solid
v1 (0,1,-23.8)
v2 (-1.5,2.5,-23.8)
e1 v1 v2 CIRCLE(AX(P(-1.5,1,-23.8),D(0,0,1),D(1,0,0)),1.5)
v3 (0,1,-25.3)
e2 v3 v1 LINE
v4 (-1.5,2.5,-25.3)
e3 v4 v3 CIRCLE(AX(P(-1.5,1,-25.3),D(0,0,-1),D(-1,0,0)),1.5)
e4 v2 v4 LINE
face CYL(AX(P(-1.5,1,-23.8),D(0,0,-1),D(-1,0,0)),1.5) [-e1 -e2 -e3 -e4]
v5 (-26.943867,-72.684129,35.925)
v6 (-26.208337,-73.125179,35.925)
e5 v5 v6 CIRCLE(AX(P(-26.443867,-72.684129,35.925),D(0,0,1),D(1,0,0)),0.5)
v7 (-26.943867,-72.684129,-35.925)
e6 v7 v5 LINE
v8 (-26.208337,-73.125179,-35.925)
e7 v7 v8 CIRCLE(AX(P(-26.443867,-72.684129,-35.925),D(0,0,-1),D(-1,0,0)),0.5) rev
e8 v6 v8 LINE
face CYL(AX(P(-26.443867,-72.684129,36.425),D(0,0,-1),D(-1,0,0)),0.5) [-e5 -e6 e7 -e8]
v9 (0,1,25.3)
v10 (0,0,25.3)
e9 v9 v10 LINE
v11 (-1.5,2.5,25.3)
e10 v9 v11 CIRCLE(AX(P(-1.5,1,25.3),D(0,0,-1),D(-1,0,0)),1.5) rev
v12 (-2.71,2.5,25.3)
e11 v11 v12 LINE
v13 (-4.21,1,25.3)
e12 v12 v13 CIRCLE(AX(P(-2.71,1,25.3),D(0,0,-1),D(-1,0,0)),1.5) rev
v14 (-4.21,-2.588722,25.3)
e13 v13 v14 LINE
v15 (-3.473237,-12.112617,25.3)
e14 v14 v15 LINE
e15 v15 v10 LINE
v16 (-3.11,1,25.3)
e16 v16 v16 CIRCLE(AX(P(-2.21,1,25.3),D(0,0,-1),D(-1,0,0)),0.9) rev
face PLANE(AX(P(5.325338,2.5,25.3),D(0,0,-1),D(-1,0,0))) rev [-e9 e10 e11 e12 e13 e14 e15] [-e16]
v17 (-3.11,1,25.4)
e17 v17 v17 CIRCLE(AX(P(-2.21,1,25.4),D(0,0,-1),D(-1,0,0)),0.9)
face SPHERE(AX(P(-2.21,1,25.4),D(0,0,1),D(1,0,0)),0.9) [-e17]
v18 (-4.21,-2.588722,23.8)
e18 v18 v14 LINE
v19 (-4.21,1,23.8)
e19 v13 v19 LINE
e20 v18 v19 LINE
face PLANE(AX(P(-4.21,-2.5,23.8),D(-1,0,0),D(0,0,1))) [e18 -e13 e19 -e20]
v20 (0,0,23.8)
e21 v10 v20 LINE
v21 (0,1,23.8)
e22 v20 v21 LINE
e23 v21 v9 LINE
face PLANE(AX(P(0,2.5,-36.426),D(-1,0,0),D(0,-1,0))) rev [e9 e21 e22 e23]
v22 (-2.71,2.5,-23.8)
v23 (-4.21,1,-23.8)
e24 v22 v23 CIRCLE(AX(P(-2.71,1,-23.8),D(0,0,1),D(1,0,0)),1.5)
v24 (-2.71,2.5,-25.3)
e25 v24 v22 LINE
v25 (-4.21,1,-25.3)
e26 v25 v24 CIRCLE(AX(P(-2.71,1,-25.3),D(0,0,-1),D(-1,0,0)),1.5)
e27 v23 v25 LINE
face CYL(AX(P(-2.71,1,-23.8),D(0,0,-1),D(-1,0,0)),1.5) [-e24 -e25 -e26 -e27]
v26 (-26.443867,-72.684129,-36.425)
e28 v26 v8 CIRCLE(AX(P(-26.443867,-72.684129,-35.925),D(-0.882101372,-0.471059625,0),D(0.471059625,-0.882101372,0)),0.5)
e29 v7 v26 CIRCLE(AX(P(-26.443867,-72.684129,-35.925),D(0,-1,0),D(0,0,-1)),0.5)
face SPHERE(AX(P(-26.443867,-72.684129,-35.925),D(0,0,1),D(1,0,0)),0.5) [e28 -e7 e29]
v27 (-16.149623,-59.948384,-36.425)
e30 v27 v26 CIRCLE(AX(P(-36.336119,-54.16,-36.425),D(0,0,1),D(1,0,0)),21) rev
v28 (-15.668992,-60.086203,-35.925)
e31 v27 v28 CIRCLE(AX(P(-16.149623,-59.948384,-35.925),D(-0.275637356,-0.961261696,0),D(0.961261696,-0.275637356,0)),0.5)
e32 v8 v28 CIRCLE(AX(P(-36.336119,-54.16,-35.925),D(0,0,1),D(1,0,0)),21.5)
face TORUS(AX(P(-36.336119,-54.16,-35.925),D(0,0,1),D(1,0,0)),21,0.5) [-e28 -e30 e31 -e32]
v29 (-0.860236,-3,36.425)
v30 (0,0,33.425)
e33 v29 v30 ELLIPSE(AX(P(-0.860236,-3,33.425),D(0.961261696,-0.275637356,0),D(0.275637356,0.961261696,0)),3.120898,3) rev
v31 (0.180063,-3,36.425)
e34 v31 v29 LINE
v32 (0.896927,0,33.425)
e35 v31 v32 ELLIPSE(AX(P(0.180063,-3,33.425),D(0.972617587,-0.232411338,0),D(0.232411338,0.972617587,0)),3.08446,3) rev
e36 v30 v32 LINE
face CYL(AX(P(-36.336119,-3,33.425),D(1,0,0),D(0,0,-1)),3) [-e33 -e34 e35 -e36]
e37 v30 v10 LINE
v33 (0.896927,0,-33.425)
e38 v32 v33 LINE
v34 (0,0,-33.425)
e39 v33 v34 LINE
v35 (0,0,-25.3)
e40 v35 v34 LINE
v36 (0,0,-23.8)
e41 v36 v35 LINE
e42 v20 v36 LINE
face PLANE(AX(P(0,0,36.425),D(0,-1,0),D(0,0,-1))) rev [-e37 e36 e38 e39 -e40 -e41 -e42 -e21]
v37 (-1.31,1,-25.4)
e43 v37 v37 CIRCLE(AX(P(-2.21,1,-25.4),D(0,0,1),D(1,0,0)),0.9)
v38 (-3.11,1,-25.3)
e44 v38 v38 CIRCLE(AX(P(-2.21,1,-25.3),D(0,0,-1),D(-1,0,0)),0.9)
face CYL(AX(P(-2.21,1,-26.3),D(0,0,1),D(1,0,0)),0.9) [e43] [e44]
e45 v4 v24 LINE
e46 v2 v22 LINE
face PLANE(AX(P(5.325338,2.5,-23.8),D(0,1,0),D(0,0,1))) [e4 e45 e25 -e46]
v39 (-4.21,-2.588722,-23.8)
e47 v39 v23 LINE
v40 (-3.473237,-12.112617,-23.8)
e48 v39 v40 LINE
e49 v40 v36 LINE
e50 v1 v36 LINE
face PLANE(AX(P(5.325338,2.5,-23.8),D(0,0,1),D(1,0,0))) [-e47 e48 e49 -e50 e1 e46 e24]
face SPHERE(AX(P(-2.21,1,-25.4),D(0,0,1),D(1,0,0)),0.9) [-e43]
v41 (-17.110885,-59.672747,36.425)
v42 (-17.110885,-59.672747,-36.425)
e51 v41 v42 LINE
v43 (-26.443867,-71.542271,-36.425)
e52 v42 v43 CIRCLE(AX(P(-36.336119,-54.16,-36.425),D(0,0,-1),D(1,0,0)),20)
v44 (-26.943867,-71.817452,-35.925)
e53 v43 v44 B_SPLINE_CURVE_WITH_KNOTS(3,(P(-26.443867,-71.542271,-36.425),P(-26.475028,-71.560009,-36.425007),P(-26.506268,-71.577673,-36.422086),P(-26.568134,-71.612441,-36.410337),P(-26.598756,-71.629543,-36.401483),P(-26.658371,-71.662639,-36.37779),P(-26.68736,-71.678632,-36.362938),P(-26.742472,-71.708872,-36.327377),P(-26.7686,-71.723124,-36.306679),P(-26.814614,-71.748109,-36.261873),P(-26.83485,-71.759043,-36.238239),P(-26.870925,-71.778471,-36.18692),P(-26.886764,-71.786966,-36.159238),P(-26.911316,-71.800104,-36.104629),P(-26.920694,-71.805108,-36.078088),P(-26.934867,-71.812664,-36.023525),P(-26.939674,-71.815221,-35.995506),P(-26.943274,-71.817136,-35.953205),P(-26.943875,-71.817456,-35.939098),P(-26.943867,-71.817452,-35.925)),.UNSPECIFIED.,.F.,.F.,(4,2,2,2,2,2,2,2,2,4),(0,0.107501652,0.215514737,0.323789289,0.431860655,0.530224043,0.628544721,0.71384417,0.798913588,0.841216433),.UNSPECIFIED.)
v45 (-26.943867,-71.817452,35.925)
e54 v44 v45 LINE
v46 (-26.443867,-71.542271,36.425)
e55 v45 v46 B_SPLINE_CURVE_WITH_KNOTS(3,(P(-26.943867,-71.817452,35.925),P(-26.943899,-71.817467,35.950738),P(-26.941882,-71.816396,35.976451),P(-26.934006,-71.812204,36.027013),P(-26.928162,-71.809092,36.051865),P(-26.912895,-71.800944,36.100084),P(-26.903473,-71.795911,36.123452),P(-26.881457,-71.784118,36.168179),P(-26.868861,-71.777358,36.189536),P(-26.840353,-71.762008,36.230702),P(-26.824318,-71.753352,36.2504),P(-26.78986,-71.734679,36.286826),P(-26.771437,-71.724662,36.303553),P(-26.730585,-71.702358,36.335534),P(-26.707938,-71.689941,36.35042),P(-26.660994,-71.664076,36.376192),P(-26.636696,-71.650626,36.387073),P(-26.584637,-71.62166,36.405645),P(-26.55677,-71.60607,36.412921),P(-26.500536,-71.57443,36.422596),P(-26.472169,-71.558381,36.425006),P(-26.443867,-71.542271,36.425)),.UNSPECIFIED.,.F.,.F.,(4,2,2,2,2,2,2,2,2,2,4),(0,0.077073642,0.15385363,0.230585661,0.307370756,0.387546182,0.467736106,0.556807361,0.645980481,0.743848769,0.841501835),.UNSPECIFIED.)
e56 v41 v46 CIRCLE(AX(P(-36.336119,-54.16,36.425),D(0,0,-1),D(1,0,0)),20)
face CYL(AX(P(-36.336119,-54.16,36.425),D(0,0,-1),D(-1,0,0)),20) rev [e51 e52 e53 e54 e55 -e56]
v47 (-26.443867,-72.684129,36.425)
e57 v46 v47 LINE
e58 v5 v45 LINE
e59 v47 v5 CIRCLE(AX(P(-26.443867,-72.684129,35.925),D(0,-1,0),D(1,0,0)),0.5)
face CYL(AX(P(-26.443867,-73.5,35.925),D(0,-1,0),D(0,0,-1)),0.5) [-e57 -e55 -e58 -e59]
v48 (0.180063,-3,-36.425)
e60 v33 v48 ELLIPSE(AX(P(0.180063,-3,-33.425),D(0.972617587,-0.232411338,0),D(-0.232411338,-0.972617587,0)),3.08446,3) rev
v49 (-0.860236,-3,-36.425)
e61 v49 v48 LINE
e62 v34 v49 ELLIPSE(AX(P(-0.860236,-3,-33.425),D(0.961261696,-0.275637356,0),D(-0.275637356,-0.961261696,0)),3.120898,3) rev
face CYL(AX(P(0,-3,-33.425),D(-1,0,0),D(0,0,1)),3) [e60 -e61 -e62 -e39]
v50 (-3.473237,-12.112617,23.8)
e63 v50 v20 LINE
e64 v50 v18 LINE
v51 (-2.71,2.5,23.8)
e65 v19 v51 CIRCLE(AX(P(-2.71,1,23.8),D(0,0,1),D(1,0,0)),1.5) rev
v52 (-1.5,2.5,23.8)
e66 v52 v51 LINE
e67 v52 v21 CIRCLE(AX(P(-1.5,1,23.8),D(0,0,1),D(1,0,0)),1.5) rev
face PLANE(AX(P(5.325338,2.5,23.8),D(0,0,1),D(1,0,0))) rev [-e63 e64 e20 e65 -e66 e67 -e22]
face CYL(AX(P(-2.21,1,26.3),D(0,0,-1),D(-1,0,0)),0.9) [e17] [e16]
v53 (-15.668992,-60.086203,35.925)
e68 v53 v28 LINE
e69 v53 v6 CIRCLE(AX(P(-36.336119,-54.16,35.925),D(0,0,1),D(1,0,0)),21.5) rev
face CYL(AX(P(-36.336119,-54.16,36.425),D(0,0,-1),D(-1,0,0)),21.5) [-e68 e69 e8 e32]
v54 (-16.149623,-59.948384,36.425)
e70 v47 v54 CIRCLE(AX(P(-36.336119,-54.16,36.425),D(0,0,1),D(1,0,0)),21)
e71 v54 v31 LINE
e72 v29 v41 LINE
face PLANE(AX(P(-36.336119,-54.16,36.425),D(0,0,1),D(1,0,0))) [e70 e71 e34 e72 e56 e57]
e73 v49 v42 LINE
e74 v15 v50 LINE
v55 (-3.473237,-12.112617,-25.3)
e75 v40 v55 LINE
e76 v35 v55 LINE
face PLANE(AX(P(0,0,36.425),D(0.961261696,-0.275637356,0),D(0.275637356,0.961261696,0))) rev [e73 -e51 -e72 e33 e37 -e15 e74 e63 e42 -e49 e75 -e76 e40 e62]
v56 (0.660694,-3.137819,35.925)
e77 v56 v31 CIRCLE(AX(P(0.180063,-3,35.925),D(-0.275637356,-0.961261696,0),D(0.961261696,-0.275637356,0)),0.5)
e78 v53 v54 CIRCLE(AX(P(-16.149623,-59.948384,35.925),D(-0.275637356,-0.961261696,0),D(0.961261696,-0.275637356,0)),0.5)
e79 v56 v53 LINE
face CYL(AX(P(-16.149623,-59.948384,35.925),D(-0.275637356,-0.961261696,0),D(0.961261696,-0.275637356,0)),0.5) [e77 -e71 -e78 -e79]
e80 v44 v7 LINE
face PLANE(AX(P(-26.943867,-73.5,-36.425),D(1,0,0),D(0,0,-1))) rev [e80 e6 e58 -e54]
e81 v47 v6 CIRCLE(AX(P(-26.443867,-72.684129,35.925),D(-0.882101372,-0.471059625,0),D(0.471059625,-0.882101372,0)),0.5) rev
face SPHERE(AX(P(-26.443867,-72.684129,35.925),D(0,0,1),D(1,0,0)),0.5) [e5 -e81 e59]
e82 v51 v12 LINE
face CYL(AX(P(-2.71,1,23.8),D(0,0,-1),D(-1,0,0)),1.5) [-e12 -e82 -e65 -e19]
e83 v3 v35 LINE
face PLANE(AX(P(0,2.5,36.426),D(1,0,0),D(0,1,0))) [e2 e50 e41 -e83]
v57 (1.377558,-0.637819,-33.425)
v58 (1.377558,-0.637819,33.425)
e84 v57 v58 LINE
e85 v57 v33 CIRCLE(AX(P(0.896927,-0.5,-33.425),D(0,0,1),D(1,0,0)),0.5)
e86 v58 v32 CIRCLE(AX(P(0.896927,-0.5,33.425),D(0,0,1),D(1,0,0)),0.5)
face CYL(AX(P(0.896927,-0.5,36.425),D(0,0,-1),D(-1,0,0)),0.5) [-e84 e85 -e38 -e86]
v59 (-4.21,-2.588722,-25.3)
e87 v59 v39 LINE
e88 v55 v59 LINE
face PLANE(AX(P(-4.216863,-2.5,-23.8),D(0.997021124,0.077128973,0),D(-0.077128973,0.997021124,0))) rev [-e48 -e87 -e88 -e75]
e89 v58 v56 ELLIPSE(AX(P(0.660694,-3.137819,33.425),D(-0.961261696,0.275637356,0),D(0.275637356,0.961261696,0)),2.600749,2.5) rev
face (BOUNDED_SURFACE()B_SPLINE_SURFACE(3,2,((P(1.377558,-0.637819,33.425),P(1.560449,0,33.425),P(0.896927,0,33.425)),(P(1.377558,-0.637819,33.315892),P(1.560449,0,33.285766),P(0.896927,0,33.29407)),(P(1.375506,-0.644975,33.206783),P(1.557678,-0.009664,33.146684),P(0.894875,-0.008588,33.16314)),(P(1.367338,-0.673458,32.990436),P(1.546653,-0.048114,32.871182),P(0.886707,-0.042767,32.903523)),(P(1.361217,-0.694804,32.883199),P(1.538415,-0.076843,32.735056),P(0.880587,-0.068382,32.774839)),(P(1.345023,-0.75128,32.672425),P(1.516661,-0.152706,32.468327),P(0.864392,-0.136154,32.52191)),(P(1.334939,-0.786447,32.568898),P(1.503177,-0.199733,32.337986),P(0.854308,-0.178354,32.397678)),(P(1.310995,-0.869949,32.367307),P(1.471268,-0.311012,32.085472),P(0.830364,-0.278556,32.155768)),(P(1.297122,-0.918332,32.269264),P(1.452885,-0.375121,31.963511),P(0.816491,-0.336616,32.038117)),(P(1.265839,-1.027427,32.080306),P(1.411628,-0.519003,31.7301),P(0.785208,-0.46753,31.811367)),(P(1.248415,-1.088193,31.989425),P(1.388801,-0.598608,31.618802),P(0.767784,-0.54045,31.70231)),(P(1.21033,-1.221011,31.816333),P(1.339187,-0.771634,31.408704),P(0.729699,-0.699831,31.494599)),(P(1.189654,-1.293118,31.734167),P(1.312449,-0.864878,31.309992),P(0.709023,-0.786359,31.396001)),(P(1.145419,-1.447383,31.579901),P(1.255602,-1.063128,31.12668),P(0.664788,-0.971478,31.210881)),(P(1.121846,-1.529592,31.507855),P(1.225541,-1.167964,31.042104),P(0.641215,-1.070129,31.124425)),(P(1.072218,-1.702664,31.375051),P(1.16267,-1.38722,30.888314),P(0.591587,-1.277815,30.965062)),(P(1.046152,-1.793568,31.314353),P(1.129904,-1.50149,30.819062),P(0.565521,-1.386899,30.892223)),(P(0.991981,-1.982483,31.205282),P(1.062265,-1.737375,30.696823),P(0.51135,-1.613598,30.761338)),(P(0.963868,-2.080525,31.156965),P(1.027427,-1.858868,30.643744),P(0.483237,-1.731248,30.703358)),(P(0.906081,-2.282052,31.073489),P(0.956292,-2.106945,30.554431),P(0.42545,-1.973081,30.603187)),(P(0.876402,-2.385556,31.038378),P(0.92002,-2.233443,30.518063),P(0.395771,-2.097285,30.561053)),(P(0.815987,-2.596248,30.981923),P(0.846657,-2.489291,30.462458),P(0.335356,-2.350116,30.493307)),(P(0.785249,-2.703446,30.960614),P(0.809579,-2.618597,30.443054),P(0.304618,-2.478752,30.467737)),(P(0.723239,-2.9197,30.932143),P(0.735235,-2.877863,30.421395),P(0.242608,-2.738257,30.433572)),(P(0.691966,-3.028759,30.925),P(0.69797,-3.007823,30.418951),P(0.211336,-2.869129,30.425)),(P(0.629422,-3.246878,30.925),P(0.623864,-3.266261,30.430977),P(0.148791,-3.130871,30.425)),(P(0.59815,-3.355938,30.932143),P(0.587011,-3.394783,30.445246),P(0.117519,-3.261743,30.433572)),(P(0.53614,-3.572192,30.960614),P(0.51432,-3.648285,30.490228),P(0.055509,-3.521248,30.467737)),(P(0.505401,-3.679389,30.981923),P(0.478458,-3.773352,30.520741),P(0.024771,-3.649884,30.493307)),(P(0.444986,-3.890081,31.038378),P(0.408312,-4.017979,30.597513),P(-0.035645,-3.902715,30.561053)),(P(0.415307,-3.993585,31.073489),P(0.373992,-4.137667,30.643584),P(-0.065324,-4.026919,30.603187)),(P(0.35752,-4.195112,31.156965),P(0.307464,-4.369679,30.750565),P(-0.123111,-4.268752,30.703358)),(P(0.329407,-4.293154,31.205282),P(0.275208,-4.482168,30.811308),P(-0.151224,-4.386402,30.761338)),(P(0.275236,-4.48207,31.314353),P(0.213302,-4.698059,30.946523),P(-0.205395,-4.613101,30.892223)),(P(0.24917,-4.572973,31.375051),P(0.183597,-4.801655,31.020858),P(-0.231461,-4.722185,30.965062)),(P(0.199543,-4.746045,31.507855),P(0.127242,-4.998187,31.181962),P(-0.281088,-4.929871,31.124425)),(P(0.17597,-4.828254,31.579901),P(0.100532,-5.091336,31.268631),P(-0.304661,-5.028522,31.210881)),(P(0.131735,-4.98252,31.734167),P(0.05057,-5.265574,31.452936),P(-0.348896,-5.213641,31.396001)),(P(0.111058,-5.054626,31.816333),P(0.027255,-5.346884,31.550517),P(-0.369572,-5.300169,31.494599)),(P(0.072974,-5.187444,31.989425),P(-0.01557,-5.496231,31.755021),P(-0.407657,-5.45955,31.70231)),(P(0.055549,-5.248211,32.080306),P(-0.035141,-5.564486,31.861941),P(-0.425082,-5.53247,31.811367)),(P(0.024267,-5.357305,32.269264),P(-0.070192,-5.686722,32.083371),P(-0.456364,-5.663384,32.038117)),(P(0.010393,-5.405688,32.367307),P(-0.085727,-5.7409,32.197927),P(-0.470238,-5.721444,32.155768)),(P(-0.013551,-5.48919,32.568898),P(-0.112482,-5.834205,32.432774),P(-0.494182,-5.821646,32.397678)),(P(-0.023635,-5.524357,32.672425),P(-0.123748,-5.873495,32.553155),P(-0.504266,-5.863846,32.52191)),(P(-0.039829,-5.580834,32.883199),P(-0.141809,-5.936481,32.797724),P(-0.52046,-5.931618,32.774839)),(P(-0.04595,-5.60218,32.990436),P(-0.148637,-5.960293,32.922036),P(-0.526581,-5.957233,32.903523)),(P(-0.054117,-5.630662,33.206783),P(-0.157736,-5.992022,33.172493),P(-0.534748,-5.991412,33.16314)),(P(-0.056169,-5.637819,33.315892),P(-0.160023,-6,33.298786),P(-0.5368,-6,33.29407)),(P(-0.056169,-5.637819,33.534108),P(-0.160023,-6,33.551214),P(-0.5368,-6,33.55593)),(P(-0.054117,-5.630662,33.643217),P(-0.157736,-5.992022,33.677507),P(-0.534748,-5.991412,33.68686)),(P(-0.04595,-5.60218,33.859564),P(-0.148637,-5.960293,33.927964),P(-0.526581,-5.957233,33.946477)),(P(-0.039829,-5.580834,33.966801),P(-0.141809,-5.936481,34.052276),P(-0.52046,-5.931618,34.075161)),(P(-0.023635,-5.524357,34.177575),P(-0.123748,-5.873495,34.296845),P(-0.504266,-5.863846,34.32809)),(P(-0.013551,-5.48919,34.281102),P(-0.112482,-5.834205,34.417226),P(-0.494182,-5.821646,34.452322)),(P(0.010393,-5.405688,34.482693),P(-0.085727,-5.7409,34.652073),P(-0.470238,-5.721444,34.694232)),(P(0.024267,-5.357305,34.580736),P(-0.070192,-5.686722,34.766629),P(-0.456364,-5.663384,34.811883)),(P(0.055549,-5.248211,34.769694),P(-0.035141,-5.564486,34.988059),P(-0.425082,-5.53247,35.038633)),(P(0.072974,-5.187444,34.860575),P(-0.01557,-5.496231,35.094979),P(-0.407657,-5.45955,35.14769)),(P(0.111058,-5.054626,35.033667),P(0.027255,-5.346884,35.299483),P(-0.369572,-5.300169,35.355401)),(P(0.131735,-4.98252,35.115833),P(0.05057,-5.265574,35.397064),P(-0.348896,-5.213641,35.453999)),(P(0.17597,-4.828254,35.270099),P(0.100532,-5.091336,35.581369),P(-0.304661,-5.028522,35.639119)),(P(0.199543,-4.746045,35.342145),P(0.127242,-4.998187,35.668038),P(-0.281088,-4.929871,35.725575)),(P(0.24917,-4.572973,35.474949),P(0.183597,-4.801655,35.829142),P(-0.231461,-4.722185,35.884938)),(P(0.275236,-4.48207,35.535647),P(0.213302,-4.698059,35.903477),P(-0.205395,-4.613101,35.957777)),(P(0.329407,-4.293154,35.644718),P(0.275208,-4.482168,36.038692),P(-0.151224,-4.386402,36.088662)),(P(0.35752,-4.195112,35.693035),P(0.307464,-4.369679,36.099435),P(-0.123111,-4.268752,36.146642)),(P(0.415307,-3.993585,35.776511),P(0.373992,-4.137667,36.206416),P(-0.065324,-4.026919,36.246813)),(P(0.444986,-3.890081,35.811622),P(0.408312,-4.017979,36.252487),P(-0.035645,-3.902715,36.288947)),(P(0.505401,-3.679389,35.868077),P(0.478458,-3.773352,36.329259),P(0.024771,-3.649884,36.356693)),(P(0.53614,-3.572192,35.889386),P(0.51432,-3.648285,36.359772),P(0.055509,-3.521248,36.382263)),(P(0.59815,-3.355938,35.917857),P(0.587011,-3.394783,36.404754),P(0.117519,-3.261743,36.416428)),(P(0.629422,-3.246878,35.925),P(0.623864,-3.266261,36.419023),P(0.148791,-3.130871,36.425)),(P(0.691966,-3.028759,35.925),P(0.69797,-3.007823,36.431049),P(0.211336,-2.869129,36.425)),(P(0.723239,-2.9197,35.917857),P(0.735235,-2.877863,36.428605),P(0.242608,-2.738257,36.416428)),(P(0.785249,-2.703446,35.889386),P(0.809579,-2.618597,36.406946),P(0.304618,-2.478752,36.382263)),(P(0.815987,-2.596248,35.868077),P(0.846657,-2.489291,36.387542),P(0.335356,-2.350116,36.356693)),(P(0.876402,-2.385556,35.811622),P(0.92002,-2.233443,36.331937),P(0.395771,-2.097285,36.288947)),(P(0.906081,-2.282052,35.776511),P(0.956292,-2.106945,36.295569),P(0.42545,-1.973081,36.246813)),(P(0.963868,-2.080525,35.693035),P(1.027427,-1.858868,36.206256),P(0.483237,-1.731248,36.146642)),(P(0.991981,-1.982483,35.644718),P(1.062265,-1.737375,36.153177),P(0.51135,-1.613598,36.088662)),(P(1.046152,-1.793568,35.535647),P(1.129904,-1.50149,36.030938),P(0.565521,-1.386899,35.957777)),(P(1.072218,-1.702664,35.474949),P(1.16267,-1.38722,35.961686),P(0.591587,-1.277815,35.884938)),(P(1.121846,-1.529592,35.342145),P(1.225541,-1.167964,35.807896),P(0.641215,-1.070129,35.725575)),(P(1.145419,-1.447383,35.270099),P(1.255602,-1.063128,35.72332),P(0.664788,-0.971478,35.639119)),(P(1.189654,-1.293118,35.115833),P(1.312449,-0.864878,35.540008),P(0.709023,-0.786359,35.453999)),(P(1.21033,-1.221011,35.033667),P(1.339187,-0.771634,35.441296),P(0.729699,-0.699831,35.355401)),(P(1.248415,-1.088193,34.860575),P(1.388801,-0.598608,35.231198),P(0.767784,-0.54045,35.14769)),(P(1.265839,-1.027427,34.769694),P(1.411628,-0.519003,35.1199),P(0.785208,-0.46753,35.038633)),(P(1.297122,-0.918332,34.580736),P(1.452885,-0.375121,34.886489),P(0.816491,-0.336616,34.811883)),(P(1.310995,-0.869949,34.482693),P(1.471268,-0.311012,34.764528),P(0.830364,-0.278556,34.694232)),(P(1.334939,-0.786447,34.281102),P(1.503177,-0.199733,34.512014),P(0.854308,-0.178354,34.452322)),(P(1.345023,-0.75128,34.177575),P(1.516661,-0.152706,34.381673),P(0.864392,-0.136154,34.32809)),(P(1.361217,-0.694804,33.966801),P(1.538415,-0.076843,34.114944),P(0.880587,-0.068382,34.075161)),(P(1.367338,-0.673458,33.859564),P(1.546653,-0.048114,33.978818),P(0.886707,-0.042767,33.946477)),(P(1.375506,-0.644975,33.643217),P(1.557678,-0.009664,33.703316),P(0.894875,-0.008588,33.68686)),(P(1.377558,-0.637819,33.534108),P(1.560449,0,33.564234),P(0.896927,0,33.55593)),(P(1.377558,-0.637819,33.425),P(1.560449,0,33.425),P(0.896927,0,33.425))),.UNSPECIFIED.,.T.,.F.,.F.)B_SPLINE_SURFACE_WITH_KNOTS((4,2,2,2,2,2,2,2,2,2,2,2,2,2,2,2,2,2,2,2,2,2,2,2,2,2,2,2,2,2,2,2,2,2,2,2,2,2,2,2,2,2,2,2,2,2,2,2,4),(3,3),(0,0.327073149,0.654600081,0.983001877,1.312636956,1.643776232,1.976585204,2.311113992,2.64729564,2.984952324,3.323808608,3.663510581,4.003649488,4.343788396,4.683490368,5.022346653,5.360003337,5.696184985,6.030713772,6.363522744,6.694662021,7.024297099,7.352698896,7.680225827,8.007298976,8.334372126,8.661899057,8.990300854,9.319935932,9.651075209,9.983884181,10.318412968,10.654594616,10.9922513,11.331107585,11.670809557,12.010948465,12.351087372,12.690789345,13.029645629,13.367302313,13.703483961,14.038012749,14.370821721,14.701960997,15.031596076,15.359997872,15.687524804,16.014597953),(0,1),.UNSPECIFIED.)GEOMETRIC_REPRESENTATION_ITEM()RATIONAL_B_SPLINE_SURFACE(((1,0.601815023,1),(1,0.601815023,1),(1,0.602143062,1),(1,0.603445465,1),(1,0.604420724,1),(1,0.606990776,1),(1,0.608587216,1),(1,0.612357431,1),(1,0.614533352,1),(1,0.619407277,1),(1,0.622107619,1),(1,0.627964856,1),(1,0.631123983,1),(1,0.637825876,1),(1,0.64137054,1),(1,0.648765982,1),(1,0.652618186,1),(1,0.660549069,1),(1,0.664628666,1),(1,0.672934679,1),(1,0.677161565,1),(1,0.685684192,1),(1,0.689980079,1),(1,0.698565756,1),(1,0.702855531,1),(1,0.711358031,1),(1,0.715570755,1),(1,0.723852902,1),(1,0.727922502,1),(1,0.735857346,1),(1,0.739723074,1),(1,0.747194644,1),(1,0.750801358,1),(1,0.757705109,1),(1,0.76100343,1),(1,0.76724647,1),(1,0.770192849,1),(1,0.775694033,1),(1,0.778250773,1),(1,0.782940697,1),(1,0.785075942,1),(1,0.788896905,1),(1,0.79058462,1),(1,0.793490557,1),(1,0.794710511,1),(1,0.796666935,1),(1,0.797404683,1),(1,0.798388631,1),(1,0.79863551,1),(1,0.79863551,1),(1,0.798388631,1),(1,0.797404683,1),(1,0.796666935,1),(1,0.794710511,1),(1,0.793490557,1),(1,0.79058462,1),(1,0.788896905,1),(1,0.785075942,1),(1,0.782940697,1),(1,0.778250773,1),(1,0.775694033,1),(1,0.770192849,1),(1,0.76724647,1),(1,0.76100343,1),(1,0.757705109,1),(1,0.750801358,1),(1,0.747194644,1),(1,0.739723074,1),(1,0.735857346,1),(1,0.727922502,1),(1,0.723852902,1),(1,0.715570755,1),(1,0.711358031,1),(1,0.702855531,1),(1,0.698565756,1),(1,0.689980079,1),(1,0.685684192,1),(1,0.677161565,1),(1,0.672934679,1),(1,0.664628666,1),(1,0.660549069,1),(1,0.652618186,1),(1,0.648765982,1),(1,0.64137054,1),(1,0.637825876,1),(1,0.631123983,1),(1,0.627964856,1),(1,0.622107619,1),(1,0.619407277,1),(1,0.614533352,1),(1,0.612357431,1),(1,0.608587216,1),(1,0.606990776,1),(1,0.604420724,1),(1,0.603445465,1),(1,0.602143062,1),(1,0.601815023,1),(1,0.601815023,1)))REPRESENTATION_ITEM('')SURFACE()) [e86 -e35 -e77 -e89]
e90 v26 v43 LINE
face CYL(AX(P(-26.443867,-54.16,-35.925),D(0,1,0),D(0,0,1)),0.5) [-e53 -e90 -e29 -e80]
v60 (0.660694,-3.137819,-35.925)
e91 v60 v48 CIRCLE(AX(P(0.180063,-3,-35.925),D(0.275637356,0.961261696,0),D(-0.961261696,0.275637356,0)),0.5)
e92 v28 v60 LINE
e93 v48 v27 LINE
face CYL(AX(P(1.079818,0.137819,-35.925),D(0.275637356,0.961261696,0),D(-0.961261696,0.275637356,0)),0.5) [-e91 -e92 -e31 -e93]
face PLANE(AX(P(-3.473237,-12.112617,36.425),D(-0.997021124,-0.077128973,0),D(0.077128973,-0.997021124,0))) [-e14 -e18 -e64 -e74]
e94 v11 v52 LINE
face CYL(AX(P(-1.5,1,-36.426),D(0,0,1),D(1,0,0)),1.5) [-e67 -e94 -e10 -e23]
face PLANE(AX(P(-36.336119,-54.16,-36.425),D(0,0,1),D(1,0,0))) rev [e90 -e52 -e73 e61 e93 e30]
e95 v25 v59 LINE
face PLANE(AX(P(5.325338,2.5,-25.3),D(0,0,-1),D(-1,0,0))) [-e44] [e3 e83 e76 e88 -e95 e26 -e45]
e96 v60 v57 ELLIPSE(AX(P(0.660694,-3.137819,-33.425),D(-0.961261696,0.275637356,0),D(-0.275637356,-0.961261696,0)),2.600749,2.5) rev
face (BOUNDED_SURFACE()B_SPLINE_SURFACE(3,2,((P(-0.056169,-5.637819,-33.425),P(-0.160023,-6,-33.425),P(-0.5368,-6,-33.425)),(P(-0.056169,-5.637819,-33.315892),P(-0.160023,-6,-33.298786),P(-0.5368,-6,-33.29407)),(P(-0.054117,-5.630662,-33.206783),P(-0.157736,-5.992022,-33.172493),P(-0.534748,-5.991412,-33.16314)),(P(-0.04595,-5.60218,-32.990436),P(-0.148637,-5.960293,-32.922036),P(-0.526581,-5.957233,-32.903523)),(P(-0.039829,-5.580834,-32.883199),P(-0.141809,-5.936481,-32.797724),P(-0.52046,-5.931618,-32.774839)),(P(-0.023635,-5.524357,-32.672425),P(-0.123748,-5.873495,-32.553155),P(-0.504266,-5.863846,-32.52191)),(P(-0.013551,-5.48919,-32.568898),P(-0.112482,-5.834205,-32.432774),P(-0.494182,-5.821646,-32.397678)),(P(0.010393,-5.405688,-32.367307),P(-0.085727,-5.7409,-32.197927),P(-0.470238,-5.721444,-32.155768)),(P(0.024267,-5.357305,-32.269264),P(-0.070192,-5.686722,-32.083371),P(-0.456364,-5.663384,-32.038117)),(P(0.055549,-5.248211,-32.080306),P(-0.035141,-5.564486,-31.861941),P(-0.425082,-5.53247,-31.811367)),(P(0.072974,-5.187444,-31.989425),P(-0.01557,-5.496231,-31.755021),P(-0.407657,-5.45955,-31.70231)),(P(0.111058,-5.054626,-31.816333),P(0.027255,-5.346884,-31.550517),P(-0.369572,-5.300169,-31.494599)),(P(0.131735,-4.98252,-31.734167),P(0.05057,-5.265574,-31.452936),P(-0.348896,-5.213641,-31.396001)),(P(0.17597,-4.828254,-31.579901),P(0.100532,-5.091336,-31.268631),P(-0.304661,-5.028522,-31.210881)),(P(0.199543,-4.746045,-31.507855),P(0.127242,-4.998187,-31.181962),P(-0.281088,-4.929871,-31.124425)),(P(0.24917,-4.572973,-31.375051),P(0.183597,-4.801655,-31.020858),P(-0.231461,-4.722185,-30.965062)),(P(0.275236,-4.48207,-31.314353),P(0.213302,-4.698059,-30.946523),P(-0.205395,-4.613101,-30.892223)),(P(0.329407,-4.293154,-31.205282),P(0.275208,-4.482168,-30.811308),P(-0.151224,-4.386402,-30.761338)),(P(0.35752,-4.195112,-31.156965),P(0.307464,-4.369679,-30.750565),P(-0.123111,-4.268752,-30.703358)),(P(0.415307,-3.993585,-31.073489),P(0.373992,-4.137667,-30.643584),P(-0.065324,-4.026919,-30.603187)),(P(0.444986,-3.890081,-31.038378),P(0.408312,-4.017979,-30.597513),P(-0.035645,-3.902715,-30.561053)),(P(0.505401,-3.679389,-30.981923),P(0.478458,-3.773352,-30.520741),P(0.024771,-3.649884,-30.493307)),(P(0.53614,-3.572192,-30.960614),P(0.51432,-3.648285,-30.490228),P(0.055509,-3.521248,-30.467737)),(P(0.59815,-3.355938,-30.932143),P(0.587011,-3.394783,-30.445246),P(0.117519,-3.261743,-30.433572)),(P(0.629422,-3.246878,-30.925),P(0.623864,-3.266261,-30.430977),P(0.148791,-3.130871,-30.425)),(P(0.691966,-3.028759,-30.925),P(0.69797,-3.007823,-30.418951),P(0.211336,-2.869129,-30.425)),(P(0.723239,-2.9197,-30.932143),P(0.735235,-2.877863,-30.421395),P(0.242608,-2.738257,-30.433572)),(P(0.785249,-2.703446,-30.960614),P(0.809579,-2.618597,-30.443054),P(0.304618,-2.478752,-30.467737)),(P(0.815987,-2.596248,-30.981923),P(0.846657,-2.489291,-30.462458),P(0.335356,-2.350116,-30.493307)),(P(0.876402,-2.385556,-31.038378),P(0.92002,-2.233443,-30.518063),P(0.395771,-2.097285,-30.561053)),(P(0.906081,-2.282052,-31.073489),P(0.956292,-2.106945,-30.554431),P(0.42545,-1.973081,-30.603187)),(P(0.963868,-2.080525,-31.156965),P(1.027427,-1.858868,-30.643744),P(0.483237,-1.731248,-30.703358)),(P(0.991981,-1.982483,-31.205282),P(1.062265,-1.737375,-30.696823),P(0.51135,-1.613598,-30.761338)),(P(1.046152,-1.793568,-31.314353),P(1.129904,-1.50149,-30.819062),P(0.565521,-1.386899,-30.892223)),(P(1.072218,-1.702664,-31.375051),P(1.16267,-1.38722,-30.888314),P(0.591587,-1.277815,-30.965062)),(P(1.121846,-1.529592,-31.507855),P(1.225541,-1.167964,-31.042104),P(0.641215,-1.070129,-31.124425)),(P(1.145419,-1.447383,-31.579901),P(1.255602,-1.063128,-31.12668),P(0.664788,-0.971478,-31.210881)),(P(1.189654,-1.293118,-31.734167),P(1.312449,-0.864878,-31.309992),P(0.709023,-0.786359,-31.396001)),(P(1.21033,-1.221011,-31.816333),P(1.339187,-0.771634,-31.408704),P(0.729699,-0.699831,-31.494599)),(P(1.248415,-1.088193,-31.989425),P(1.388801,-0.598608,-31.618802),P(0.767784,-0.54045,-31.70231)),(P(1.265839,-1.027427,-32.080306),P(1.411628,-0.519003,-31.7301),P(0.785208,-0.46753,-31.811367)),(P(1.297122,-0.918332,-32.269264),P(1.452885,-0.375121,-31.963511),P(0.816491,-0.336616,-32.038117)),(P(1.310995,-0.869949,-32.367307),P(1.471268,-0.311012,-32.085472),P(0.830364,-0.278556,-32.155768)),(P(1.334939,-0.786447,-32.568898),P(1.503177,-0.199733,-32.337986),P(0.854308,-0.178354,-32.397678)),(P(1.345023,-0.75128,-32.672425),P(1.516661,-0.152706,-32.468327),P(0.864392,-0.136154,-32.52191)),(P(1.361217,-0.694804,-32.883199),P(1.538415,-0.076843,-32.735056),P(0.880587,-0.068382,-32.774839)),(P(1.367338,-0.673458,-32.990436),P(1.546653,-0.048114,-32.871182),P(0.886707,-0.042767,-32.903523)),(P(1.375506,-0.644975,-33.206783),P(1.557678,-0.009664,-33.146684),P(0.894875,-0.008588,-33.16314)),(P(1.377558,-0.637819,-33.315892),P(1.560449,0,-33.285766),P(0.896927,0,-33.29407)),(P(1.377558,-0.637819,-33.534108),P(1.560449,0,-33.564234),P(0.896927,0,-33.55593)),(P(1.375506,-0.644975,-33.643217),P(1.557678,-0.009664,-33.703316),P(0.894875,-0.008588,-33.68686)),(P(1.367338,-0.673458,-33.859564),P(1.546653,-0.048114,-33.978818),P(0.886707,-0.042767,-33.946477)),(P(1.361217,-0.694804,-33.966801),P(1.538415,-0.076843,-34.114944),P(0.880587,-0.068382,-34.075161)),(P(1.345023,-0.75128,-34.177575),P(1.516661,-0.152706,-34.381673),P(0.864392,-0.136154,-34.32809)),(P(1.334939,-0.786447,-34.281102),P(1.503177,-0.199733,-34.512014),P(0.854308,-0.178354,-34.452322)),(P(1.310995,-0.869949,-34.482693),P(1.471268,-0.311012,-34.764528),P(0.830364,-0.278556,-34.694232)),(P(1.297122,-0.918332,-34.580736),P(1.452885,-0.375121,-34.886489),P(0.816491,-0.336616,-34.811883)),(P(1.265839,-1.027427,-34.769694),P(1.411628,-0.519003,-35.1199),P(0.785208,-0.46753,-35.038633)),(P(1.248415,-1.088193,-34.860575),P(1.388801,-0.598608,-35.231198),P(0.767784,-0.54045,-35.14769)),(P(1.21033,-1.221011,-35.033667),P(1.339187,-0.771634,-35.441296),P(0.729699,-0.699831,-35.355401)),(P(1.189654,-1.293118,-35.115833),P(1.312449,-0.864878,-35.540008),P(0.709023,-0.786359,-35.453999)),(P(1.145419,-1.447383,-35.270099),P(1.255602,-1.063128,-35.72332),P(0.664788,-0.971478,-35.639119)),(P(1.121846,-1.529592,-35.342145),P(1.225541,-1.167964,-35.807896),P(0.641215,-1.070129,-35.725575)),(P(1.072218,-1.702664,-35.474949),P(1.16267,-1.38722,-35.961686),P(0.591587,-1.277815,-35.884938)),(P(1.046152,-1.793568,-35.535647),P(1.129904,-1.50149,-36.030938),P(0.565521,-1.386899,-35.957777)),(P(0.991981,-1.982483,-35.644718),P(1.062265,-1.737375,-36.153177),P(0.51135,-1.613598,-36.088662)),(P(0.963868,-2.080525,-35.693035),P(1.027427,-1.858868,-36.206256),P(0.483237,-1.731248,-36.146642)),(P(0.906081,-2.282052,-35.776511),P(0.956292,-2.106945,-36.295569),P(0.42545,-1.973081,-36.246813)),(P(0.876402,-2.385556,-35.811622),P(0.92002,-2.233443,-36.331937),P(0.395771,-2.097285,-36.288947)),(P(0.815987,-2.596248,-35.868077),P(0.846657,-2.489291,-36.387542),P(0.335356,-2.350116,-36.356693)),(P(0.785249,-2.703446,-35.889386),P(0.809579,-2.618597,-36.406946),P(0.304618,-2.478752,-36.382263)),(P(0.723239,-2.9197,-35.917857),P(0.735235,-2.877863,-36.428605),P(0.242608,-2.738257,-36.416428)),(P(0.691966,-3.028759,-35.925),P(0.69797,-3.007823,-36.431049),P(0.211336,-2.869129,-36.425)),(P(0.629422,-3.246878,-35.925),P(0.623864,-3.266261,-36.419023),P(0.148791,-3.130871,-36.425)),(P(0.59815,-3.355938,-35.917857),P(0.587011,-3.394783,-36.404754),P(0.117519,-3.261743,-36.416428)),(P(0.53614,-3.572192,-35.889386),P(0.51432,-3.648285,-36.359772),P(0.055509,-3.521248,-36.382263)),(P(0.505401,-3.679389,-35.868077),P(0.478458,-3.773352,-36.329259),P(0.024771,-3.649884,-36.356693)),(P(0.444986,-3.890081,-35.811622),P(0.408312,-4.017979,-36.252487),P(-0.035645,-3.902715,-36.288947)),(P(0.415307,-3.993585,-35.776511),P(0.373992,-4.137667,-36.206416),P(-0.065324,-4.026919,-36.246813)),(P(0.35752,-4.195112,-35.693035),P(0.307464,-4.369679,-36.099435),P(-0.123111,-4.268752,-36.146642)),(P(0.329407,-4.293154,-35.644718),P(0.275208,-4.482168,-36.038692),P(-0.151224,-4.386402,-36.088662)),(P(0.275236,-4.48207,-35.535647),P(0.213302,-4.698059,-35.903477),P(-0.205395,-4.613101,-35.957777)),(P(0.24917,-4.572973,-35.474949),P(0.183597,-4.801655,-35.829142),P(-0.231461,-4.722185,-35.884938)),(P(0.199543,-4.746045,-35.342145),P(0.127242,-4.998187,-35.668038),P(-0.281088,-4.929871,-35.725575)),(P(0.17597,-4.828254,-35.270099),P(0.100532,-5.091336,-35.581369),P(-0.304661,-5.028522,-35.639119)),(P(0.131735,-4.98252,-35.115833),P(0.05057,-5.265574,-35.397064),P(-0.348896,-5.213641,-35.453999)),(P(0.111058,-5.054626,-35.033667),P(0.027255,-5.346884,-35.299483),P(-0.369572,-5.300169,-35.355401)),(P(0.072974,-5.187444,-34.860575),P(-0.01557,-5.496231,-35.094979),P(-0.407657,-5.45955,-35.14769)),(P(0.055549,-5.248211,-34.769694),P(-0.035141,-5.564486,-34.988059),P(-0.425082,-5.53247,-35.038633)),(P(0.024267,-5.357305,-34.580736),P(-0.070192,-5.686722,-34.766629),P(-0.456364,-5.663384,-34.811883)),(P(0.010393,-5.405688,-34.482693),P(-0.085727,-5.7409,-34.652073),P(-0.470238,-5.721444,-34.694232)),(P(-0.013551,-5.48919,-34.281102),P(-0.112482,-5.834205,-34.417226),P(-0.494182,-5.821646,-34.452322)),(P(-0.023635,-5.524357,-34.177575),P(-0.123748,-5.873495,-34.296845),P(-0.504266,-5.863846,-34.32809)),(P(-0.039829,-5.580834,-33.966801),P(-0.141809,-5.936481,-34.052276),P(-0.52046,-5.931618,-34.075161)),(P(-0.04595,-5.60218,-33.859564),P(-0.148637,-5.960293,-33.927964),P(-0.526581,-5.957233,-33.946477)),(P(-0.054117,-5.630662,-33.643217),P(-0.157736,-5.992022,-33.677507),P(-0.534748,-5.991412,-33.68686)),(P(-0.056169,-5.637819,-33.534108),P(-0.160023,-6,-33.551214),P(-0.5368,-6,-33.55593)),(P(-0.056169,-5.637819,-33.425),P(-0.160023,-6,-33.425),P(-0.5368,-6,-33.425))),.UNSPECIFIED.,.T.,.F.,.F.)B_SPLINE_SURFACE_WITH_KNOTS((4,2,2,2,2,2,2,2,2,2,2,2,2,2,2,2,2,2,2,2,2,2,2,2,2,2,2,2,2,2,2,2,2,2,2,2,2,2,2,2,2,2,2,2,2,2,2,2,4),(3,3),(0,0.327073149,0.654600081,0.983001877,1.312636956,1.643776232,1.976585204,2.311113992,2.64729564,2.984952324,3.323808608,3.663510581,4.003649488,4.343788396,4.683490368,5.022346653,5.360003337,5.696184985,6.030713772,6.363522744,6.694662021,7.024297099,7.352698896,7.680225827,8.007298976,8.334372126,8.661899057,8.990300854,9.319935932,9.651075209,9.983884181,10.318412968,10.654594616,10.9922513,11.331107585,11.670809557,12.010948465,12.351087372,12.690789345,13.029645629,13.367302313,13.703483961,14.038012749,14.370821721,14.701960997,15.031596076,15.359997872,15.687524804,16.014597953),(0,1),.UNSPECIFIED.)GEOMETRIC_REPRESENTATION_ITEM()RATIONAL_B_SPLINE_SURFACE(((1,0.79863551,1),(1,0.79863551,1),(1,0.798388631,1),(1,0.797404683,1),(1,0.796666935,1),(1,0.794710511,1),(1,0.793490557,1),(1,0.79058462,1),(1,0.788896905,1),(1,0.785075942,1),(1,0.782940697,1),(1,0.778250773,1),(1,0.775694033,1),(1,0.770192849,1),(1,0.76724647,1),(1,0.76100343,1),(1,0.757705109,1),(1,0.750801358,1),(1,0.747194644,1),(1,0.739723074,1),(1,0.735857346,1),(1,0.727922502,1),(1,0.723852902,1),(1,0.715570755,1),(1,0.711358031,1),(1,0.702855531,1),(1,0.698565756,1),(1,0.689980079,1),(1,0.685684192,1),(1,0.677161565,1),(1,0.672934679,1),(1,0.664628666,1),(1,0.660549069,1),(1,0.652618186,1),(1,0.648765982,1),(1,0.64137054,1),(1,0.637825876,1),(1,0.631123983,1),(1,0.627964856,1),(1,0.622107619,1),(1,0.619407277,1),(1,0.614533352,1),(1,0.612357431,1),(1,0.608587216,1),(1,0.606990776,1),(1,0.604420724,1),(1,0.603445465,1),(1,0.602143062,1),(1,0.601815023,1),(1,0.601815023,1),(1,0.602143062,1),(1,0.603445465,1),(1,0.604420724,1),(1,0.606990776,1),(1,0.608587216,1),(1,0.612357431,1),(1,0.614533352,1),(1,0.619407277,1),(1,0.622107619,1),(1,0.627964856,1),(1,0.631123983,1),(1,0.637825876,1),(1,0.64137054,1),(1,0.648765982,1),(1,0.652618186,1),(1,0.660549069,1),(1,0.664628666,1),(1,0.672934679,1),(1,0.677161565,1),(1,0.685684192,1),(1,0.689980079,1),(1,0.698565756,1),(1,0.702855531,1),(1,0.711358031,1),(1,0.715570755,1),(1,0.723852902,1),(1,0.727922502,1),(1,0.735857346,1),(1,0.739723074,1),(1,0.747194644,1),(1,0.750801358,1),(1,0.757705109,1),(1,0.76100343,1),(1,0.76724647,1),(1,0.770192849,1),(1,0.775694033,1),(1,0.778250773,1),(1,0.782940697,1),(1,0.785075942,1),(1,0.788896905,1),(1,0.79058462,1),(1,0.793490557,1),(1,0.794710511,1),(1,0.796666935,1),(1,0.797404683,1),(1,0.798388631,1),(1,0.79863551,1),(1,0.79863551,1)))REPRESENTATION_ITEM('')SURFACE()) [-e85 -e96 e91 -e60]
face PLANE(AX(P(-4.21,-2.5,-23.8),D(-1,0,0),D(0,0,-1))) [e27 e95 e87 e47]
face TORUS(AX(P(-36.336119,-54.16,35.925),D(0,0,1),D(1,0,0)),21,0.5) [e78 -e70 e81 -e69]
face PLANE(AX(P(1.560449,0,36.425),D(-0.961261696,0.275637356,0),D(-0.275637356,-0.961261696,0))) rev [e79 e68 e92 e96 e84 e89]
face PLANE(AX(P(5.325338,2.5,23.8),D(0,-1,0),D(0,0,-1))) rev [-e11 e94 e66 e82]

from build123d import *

# Parameters (mm, degrees)
BOSS_EXTRUDE1_DEPTH   = 36.425
CUT_EXTRUDE1_DEPTH    = 110.090212662
CUT_EXTRUDE2_DEPTH    = 109.098783751
FILLET1_R             = 3
BOSS_EXTRUDE12_REACH  = 92.552
BOSS_EXTRUDE12_START  = -4.21
SKETCH27_W            = 1.5
SKETCH27_H            = 5
CUT_EXTRUDE9_REACH    = 101.691
SKETCH30_W            = 0.716863464
SKETCH30_H            = 2.5
SKETCH31_R            = 0.9
BOSS_EXTRUDE13_DEPTH  = 1
FILLET9_R             = 1.5
FILLET10_R            = 1.5
FILLET11_R            = 0.9
FILLET9_OF_MIRROR4_R  = 1.5
FILLET10_OF_MIRROR4_R = 1.5
FILLET11_OF_MIRROR4_R = 0.9
FILLET12_R            = 0.5


with BuildPart() as part:
    # Sketch1 → Boss-Extrude1 (new, symmetric)
    with BuildSketch(Plane.XY):
        with BuildLine():
            Line((0, 0), (-17.110884891, -59.672747116))
            ThreePointArc((-17.110884891, -59.672747116), (-22.347799076, -68.454296451), (-31.240591359, -73.5))
            Line((-31.240591359, -73.5), (-30.858426801, -74.9505))
            ThreePointArc((-30.858426801, -74.9505), (-21.298675096, -69.526368685), (-15.668992347, -60.08620315))
            Line((-15.668992347, -60.08620315), (1.441892544, -0.413456034))
            Line((1.441892544, -0.413456034), (1.560449154, 0))
            Line((1.560449154, 0), (0, 0))
        make_face()
    extrude(amount=BOSS_EXTRUDE1_DEPTH, both=True)

    # Sketch2 → Cut-Extrude1 (cut, through all)
    with BuildSketch(Plane.XY.offset(36.425)):
        with BuildLine():
            Line((-31.240591359, -73.5), (-26.943866684, -73.5))
            ThreePointArc((-26.943866684, -73.5), (-28.865857957, -74.320486174), (-30.858426801, -74.9505))
            Line((-30.858426801, -74.9505), (-31.240591359, -73.5))
        make_face()
    extrude(amount=-CUT_EXTRUDE1_DEPTH, mode=Mode.SUBTRACT)

    # Sketch3 → Cut-Extrude2 (cut, through all)
    with BuildSketch(Plane.XY.offset(36.425)):
        with BuildLine():
            Line((-26.943866684, -73.5), (-31.240591359, -73.5))
            ThreePointArc((-31.240591359, -73.5), (-29.043541661, -72.783058785), (-26.943866684, -71.817451685))
            Line((-26.943866684, -71.817451685), (-26.943866684, -73.5))
        make_face()
    extrude(amount=-CUT_EXTRUDE2_DEPTH, mode=Mode.SUBTRACT)

    # Fillet1
    fillet1_edges = [part.edges().sort_by_distance(p)[0] for p in [
        (0.780224577, 0, 36.425),
        (0.780224577, 0, -36.425),
    ]]
    fillet(fillet1_edges, radius=FILLET1_R)

    # Boss-Extrude12: up to this plane
    boss_extrude12_end = Plane(origin=(0, 0, 36.425), z_dir=(0.9612616959383179, -0.2756373558170027, 0))
    # Sketch27 → Boss-Extrude12 (add, up to the surface)
    with BuildSketch(Plane(origin=(0, 0, 0), x_dir=(0, 0, -1), z_dir=(1, 0, 0)).offset(BOSS_EXTRUDE12_START), mode=Mode.PRIVATE) as boss_extrude12_sk1:
        with Locations((-24.55, 0)):
            Rectangle(SKETCH27_W, SKETCH27_H)
    boss_extrude12_tool1 = split(extrude(boss_extrude12_sk1.sketch, amount=BOSS_EXTRUDE12_REACH, mode=Mode.PRIVATE), bisect_by=boss_extrude12_end, keep=Keep.BOTH, mode=Mode.PRIVATE)
    boss_extrude12 = boss_extrude12_tool1.solids().sort_by_distance((-4.21, 0, 24.55))[0]
    add(boss_extrude12)

    # Sketch30 → Cut-Extrude9 (cut, up to next)
    with BuildSketch(Plane.XY.offset(25.3), mode=Mode.PRIVATE) as cut_extrude9_sk1:
        with Locations((0.358431732, 1.25)):
            Rectangle(SKETCH30_W, SKETCH30_H)
    cut_extrude9_tool1 = extrude(cut_extrude9_sk1.sketch, amount=-CUT_EXTRUDE9_REACH, mode=Mode.PRIVATE) & part.part
    cut_extrude9 = cut_extrude9_tool1.solids().sort_by_distance((0.358432, 1.25, 25.3))[0]
    add(cut_extrude9, mode=Mode.SUBTRACT)

    # Sketch31 → Boss-Extrude13 (add)
    with BuildSketch(Plane.XY.offset(25.3)):
        with Locations(Location((-2.21, 1, 0), (0, 0, 180))):
            Circle(SKETCH31_R)
    boss_extrude13 = extrude(amount=BOSS_EXTRUDE13_DEPTH)

    # Fillet9
    fillet9_edges = [part.edges().sort_by_distance(p)[0] for p in [
        (-4.21, 2.5, 24.55),
    ]]
    fillet(fillet9_edges, radius=FILLET9_R)

    # Fillet10
    fillet10_edges = [part.edges().sort_by_distance(p)[0] for p in [
        (0, 2.5, 24.55),
    ]]
    fillet(fillet10_edges, radius=FILLET10_R)

    # Fillet11
    fillet11_edges = [part.edges().sort_by_distance(p)[0] for p in [
        (-1.31, 1, 26.3),
    ]]
    fillet(fillet11_edges, radius=FILLET11_R)

    # Mirror4: Boss-Extrude12, Cut-Extrude9, Boss-Extrude13 across plane
    add(boss_extrude12.mirror(Plane.XY))
    add(cut_extrude9.mirror(Plane.XY), mode=Mode.SUBTRACT)
    add(boss_extrude13.mirror(Plane.XY))

    # Fillet9 of Mirror4
    fillet9_of_mirror4_edges = [part.edges().sort_by_distance(p)[0] for p in [
        (-4.21, 2.5, -24.55),
    ]]
    fillet(fillet9_of_mirror4_edges, radius=FILLET9_OF_MIRROR4_R)

    # Fillet10 of Mirror4
    fillet10_of_mirror4_edges = [part.edges().sort_by_distance(p)[0] for p in [
        (0, 2.5, -24.55),
    ]]
    fillet(fillet10_of_mirror4_edges, radius=FILLET10_OF_MIRROR4_R)

    # Fillet11 of Mirror4
    fillet11_of_mirror4_edges = [part.edges().sort_by_distance(p)[0] for p in [
        (-1.31, 1, -26.3),
    ]]
    fillet(fillet11_of_mirror4_edges, radius=FILLET11_OF_MIRROR4_R)

    # Fillet12
    fillet12_edges = [part.edges().sort_by_distance(p)[0] for p in [
        (-7.484389675, -31.543101575, 36.425),
        (-19.877867178, -67.993869785, -36.425),
        (-19.877867178, -67.993869785, 36.425),
        (-26.943866684, -73.5, 0),
        (-26.943866684, -72.658725842, -36.425),
        (-26.943866684, -72.658725842, 36.425),
        (1.560449154, 0, 0),
        (1.302457732, -0.899723012, 35.567156991),
        (1.302457732, -0.899723012, -35.567156991),
        (-7.484389675, -31.543101575, -36.425),
    ]]
    fillet(fillet12_edges, radius=FILLET12_R)

    # Chamfer1
    # the kernel refuses this chamfer: 10, 3.5 mm, written as the material it adds along each edge
    with BuildSketch(Plane(origin=(-0.716863464, -2.5, 25.3), x_dir=(-0.26268080042718955, -0.9648827892997839, 0), z_dir=(0, 0, -1))) as chamfer1_piece_1_section:
        with BuildLine():
            Line((10.375794366, 0), (0.542683512, 3.511617253))
            Line((0.542683512, 3.511617253), (0.349706955, 3.564153413))
            ThreePointArc((0.349706955, 3.564153413), (0.270766903, 1.755965125), (-0.192976558, 0.05253616))
            Line((-0.192976558, 0.05253616), (0.00269055, -0.199981902))
            ThreePointArc((0.00269055, -0.199981902), (5.189648845, -0.130196738), (10.378484916, -0.199981902))
            Line((10.378484916, -0.199981902), (10.375794366, 0))
        make_face()
    chamfer1_piece_1 = extrude(amount=1.5, mode=Mode.PRIVATE)
    chamfer1_piece_1 = split(chamfer1_piece_1, bisect_by=Plane(origin=(-4.21, -5.808119571, 24.55), z_dir=(1, 0, 0)), keep=Keep.TOP, mode=Mode.PRIVATE)
    add(chamfer1_piece_1)
    with BuildSketch(Plane(origin=(-0.716863464, -2.5, -25.3), x_dir=(-0.26268080042718955, -0.9648827892997839, 0), z_dir=(0, 0, 1))) as chamfer1_piece_2_section:
        with BuildLine():
            Line((10.375794366, 0), (0.542683512, -3.511617253))
            Line((0.542683512, -3.511617253), (0.349706955, -3.564153413))
            ThreePointArc((0.349706955, -3.564153413), (0.270766903, -1.755965125), (-0.192976558, -0.05253616))
            Line((-0.192976558, -0.05253616), (0.00269055, 0.199981902))
            ThreePointArc((0.00269055, 0.199981902), (5.189648845, 0.130196738), (10.378484916, 0.199981902))
            Line((10.378484916, 0.199981902), (10.375794366, 0))
        make_face()
    chamfer1_piece_2 = extrude(amount=1.5, mode=Mode.PRIVATE)
    chamfer1_piece_2 = split(chamfer1_piece_2, bisect_by=Plane(origin=(-4.21, -5.808119571, -24.55), z_dir=(1, 0, 0)), keep=Keep.TOP, mode=Mode.PRIVATE)
    add(chamfer1_piece_2)


solid = part.part
